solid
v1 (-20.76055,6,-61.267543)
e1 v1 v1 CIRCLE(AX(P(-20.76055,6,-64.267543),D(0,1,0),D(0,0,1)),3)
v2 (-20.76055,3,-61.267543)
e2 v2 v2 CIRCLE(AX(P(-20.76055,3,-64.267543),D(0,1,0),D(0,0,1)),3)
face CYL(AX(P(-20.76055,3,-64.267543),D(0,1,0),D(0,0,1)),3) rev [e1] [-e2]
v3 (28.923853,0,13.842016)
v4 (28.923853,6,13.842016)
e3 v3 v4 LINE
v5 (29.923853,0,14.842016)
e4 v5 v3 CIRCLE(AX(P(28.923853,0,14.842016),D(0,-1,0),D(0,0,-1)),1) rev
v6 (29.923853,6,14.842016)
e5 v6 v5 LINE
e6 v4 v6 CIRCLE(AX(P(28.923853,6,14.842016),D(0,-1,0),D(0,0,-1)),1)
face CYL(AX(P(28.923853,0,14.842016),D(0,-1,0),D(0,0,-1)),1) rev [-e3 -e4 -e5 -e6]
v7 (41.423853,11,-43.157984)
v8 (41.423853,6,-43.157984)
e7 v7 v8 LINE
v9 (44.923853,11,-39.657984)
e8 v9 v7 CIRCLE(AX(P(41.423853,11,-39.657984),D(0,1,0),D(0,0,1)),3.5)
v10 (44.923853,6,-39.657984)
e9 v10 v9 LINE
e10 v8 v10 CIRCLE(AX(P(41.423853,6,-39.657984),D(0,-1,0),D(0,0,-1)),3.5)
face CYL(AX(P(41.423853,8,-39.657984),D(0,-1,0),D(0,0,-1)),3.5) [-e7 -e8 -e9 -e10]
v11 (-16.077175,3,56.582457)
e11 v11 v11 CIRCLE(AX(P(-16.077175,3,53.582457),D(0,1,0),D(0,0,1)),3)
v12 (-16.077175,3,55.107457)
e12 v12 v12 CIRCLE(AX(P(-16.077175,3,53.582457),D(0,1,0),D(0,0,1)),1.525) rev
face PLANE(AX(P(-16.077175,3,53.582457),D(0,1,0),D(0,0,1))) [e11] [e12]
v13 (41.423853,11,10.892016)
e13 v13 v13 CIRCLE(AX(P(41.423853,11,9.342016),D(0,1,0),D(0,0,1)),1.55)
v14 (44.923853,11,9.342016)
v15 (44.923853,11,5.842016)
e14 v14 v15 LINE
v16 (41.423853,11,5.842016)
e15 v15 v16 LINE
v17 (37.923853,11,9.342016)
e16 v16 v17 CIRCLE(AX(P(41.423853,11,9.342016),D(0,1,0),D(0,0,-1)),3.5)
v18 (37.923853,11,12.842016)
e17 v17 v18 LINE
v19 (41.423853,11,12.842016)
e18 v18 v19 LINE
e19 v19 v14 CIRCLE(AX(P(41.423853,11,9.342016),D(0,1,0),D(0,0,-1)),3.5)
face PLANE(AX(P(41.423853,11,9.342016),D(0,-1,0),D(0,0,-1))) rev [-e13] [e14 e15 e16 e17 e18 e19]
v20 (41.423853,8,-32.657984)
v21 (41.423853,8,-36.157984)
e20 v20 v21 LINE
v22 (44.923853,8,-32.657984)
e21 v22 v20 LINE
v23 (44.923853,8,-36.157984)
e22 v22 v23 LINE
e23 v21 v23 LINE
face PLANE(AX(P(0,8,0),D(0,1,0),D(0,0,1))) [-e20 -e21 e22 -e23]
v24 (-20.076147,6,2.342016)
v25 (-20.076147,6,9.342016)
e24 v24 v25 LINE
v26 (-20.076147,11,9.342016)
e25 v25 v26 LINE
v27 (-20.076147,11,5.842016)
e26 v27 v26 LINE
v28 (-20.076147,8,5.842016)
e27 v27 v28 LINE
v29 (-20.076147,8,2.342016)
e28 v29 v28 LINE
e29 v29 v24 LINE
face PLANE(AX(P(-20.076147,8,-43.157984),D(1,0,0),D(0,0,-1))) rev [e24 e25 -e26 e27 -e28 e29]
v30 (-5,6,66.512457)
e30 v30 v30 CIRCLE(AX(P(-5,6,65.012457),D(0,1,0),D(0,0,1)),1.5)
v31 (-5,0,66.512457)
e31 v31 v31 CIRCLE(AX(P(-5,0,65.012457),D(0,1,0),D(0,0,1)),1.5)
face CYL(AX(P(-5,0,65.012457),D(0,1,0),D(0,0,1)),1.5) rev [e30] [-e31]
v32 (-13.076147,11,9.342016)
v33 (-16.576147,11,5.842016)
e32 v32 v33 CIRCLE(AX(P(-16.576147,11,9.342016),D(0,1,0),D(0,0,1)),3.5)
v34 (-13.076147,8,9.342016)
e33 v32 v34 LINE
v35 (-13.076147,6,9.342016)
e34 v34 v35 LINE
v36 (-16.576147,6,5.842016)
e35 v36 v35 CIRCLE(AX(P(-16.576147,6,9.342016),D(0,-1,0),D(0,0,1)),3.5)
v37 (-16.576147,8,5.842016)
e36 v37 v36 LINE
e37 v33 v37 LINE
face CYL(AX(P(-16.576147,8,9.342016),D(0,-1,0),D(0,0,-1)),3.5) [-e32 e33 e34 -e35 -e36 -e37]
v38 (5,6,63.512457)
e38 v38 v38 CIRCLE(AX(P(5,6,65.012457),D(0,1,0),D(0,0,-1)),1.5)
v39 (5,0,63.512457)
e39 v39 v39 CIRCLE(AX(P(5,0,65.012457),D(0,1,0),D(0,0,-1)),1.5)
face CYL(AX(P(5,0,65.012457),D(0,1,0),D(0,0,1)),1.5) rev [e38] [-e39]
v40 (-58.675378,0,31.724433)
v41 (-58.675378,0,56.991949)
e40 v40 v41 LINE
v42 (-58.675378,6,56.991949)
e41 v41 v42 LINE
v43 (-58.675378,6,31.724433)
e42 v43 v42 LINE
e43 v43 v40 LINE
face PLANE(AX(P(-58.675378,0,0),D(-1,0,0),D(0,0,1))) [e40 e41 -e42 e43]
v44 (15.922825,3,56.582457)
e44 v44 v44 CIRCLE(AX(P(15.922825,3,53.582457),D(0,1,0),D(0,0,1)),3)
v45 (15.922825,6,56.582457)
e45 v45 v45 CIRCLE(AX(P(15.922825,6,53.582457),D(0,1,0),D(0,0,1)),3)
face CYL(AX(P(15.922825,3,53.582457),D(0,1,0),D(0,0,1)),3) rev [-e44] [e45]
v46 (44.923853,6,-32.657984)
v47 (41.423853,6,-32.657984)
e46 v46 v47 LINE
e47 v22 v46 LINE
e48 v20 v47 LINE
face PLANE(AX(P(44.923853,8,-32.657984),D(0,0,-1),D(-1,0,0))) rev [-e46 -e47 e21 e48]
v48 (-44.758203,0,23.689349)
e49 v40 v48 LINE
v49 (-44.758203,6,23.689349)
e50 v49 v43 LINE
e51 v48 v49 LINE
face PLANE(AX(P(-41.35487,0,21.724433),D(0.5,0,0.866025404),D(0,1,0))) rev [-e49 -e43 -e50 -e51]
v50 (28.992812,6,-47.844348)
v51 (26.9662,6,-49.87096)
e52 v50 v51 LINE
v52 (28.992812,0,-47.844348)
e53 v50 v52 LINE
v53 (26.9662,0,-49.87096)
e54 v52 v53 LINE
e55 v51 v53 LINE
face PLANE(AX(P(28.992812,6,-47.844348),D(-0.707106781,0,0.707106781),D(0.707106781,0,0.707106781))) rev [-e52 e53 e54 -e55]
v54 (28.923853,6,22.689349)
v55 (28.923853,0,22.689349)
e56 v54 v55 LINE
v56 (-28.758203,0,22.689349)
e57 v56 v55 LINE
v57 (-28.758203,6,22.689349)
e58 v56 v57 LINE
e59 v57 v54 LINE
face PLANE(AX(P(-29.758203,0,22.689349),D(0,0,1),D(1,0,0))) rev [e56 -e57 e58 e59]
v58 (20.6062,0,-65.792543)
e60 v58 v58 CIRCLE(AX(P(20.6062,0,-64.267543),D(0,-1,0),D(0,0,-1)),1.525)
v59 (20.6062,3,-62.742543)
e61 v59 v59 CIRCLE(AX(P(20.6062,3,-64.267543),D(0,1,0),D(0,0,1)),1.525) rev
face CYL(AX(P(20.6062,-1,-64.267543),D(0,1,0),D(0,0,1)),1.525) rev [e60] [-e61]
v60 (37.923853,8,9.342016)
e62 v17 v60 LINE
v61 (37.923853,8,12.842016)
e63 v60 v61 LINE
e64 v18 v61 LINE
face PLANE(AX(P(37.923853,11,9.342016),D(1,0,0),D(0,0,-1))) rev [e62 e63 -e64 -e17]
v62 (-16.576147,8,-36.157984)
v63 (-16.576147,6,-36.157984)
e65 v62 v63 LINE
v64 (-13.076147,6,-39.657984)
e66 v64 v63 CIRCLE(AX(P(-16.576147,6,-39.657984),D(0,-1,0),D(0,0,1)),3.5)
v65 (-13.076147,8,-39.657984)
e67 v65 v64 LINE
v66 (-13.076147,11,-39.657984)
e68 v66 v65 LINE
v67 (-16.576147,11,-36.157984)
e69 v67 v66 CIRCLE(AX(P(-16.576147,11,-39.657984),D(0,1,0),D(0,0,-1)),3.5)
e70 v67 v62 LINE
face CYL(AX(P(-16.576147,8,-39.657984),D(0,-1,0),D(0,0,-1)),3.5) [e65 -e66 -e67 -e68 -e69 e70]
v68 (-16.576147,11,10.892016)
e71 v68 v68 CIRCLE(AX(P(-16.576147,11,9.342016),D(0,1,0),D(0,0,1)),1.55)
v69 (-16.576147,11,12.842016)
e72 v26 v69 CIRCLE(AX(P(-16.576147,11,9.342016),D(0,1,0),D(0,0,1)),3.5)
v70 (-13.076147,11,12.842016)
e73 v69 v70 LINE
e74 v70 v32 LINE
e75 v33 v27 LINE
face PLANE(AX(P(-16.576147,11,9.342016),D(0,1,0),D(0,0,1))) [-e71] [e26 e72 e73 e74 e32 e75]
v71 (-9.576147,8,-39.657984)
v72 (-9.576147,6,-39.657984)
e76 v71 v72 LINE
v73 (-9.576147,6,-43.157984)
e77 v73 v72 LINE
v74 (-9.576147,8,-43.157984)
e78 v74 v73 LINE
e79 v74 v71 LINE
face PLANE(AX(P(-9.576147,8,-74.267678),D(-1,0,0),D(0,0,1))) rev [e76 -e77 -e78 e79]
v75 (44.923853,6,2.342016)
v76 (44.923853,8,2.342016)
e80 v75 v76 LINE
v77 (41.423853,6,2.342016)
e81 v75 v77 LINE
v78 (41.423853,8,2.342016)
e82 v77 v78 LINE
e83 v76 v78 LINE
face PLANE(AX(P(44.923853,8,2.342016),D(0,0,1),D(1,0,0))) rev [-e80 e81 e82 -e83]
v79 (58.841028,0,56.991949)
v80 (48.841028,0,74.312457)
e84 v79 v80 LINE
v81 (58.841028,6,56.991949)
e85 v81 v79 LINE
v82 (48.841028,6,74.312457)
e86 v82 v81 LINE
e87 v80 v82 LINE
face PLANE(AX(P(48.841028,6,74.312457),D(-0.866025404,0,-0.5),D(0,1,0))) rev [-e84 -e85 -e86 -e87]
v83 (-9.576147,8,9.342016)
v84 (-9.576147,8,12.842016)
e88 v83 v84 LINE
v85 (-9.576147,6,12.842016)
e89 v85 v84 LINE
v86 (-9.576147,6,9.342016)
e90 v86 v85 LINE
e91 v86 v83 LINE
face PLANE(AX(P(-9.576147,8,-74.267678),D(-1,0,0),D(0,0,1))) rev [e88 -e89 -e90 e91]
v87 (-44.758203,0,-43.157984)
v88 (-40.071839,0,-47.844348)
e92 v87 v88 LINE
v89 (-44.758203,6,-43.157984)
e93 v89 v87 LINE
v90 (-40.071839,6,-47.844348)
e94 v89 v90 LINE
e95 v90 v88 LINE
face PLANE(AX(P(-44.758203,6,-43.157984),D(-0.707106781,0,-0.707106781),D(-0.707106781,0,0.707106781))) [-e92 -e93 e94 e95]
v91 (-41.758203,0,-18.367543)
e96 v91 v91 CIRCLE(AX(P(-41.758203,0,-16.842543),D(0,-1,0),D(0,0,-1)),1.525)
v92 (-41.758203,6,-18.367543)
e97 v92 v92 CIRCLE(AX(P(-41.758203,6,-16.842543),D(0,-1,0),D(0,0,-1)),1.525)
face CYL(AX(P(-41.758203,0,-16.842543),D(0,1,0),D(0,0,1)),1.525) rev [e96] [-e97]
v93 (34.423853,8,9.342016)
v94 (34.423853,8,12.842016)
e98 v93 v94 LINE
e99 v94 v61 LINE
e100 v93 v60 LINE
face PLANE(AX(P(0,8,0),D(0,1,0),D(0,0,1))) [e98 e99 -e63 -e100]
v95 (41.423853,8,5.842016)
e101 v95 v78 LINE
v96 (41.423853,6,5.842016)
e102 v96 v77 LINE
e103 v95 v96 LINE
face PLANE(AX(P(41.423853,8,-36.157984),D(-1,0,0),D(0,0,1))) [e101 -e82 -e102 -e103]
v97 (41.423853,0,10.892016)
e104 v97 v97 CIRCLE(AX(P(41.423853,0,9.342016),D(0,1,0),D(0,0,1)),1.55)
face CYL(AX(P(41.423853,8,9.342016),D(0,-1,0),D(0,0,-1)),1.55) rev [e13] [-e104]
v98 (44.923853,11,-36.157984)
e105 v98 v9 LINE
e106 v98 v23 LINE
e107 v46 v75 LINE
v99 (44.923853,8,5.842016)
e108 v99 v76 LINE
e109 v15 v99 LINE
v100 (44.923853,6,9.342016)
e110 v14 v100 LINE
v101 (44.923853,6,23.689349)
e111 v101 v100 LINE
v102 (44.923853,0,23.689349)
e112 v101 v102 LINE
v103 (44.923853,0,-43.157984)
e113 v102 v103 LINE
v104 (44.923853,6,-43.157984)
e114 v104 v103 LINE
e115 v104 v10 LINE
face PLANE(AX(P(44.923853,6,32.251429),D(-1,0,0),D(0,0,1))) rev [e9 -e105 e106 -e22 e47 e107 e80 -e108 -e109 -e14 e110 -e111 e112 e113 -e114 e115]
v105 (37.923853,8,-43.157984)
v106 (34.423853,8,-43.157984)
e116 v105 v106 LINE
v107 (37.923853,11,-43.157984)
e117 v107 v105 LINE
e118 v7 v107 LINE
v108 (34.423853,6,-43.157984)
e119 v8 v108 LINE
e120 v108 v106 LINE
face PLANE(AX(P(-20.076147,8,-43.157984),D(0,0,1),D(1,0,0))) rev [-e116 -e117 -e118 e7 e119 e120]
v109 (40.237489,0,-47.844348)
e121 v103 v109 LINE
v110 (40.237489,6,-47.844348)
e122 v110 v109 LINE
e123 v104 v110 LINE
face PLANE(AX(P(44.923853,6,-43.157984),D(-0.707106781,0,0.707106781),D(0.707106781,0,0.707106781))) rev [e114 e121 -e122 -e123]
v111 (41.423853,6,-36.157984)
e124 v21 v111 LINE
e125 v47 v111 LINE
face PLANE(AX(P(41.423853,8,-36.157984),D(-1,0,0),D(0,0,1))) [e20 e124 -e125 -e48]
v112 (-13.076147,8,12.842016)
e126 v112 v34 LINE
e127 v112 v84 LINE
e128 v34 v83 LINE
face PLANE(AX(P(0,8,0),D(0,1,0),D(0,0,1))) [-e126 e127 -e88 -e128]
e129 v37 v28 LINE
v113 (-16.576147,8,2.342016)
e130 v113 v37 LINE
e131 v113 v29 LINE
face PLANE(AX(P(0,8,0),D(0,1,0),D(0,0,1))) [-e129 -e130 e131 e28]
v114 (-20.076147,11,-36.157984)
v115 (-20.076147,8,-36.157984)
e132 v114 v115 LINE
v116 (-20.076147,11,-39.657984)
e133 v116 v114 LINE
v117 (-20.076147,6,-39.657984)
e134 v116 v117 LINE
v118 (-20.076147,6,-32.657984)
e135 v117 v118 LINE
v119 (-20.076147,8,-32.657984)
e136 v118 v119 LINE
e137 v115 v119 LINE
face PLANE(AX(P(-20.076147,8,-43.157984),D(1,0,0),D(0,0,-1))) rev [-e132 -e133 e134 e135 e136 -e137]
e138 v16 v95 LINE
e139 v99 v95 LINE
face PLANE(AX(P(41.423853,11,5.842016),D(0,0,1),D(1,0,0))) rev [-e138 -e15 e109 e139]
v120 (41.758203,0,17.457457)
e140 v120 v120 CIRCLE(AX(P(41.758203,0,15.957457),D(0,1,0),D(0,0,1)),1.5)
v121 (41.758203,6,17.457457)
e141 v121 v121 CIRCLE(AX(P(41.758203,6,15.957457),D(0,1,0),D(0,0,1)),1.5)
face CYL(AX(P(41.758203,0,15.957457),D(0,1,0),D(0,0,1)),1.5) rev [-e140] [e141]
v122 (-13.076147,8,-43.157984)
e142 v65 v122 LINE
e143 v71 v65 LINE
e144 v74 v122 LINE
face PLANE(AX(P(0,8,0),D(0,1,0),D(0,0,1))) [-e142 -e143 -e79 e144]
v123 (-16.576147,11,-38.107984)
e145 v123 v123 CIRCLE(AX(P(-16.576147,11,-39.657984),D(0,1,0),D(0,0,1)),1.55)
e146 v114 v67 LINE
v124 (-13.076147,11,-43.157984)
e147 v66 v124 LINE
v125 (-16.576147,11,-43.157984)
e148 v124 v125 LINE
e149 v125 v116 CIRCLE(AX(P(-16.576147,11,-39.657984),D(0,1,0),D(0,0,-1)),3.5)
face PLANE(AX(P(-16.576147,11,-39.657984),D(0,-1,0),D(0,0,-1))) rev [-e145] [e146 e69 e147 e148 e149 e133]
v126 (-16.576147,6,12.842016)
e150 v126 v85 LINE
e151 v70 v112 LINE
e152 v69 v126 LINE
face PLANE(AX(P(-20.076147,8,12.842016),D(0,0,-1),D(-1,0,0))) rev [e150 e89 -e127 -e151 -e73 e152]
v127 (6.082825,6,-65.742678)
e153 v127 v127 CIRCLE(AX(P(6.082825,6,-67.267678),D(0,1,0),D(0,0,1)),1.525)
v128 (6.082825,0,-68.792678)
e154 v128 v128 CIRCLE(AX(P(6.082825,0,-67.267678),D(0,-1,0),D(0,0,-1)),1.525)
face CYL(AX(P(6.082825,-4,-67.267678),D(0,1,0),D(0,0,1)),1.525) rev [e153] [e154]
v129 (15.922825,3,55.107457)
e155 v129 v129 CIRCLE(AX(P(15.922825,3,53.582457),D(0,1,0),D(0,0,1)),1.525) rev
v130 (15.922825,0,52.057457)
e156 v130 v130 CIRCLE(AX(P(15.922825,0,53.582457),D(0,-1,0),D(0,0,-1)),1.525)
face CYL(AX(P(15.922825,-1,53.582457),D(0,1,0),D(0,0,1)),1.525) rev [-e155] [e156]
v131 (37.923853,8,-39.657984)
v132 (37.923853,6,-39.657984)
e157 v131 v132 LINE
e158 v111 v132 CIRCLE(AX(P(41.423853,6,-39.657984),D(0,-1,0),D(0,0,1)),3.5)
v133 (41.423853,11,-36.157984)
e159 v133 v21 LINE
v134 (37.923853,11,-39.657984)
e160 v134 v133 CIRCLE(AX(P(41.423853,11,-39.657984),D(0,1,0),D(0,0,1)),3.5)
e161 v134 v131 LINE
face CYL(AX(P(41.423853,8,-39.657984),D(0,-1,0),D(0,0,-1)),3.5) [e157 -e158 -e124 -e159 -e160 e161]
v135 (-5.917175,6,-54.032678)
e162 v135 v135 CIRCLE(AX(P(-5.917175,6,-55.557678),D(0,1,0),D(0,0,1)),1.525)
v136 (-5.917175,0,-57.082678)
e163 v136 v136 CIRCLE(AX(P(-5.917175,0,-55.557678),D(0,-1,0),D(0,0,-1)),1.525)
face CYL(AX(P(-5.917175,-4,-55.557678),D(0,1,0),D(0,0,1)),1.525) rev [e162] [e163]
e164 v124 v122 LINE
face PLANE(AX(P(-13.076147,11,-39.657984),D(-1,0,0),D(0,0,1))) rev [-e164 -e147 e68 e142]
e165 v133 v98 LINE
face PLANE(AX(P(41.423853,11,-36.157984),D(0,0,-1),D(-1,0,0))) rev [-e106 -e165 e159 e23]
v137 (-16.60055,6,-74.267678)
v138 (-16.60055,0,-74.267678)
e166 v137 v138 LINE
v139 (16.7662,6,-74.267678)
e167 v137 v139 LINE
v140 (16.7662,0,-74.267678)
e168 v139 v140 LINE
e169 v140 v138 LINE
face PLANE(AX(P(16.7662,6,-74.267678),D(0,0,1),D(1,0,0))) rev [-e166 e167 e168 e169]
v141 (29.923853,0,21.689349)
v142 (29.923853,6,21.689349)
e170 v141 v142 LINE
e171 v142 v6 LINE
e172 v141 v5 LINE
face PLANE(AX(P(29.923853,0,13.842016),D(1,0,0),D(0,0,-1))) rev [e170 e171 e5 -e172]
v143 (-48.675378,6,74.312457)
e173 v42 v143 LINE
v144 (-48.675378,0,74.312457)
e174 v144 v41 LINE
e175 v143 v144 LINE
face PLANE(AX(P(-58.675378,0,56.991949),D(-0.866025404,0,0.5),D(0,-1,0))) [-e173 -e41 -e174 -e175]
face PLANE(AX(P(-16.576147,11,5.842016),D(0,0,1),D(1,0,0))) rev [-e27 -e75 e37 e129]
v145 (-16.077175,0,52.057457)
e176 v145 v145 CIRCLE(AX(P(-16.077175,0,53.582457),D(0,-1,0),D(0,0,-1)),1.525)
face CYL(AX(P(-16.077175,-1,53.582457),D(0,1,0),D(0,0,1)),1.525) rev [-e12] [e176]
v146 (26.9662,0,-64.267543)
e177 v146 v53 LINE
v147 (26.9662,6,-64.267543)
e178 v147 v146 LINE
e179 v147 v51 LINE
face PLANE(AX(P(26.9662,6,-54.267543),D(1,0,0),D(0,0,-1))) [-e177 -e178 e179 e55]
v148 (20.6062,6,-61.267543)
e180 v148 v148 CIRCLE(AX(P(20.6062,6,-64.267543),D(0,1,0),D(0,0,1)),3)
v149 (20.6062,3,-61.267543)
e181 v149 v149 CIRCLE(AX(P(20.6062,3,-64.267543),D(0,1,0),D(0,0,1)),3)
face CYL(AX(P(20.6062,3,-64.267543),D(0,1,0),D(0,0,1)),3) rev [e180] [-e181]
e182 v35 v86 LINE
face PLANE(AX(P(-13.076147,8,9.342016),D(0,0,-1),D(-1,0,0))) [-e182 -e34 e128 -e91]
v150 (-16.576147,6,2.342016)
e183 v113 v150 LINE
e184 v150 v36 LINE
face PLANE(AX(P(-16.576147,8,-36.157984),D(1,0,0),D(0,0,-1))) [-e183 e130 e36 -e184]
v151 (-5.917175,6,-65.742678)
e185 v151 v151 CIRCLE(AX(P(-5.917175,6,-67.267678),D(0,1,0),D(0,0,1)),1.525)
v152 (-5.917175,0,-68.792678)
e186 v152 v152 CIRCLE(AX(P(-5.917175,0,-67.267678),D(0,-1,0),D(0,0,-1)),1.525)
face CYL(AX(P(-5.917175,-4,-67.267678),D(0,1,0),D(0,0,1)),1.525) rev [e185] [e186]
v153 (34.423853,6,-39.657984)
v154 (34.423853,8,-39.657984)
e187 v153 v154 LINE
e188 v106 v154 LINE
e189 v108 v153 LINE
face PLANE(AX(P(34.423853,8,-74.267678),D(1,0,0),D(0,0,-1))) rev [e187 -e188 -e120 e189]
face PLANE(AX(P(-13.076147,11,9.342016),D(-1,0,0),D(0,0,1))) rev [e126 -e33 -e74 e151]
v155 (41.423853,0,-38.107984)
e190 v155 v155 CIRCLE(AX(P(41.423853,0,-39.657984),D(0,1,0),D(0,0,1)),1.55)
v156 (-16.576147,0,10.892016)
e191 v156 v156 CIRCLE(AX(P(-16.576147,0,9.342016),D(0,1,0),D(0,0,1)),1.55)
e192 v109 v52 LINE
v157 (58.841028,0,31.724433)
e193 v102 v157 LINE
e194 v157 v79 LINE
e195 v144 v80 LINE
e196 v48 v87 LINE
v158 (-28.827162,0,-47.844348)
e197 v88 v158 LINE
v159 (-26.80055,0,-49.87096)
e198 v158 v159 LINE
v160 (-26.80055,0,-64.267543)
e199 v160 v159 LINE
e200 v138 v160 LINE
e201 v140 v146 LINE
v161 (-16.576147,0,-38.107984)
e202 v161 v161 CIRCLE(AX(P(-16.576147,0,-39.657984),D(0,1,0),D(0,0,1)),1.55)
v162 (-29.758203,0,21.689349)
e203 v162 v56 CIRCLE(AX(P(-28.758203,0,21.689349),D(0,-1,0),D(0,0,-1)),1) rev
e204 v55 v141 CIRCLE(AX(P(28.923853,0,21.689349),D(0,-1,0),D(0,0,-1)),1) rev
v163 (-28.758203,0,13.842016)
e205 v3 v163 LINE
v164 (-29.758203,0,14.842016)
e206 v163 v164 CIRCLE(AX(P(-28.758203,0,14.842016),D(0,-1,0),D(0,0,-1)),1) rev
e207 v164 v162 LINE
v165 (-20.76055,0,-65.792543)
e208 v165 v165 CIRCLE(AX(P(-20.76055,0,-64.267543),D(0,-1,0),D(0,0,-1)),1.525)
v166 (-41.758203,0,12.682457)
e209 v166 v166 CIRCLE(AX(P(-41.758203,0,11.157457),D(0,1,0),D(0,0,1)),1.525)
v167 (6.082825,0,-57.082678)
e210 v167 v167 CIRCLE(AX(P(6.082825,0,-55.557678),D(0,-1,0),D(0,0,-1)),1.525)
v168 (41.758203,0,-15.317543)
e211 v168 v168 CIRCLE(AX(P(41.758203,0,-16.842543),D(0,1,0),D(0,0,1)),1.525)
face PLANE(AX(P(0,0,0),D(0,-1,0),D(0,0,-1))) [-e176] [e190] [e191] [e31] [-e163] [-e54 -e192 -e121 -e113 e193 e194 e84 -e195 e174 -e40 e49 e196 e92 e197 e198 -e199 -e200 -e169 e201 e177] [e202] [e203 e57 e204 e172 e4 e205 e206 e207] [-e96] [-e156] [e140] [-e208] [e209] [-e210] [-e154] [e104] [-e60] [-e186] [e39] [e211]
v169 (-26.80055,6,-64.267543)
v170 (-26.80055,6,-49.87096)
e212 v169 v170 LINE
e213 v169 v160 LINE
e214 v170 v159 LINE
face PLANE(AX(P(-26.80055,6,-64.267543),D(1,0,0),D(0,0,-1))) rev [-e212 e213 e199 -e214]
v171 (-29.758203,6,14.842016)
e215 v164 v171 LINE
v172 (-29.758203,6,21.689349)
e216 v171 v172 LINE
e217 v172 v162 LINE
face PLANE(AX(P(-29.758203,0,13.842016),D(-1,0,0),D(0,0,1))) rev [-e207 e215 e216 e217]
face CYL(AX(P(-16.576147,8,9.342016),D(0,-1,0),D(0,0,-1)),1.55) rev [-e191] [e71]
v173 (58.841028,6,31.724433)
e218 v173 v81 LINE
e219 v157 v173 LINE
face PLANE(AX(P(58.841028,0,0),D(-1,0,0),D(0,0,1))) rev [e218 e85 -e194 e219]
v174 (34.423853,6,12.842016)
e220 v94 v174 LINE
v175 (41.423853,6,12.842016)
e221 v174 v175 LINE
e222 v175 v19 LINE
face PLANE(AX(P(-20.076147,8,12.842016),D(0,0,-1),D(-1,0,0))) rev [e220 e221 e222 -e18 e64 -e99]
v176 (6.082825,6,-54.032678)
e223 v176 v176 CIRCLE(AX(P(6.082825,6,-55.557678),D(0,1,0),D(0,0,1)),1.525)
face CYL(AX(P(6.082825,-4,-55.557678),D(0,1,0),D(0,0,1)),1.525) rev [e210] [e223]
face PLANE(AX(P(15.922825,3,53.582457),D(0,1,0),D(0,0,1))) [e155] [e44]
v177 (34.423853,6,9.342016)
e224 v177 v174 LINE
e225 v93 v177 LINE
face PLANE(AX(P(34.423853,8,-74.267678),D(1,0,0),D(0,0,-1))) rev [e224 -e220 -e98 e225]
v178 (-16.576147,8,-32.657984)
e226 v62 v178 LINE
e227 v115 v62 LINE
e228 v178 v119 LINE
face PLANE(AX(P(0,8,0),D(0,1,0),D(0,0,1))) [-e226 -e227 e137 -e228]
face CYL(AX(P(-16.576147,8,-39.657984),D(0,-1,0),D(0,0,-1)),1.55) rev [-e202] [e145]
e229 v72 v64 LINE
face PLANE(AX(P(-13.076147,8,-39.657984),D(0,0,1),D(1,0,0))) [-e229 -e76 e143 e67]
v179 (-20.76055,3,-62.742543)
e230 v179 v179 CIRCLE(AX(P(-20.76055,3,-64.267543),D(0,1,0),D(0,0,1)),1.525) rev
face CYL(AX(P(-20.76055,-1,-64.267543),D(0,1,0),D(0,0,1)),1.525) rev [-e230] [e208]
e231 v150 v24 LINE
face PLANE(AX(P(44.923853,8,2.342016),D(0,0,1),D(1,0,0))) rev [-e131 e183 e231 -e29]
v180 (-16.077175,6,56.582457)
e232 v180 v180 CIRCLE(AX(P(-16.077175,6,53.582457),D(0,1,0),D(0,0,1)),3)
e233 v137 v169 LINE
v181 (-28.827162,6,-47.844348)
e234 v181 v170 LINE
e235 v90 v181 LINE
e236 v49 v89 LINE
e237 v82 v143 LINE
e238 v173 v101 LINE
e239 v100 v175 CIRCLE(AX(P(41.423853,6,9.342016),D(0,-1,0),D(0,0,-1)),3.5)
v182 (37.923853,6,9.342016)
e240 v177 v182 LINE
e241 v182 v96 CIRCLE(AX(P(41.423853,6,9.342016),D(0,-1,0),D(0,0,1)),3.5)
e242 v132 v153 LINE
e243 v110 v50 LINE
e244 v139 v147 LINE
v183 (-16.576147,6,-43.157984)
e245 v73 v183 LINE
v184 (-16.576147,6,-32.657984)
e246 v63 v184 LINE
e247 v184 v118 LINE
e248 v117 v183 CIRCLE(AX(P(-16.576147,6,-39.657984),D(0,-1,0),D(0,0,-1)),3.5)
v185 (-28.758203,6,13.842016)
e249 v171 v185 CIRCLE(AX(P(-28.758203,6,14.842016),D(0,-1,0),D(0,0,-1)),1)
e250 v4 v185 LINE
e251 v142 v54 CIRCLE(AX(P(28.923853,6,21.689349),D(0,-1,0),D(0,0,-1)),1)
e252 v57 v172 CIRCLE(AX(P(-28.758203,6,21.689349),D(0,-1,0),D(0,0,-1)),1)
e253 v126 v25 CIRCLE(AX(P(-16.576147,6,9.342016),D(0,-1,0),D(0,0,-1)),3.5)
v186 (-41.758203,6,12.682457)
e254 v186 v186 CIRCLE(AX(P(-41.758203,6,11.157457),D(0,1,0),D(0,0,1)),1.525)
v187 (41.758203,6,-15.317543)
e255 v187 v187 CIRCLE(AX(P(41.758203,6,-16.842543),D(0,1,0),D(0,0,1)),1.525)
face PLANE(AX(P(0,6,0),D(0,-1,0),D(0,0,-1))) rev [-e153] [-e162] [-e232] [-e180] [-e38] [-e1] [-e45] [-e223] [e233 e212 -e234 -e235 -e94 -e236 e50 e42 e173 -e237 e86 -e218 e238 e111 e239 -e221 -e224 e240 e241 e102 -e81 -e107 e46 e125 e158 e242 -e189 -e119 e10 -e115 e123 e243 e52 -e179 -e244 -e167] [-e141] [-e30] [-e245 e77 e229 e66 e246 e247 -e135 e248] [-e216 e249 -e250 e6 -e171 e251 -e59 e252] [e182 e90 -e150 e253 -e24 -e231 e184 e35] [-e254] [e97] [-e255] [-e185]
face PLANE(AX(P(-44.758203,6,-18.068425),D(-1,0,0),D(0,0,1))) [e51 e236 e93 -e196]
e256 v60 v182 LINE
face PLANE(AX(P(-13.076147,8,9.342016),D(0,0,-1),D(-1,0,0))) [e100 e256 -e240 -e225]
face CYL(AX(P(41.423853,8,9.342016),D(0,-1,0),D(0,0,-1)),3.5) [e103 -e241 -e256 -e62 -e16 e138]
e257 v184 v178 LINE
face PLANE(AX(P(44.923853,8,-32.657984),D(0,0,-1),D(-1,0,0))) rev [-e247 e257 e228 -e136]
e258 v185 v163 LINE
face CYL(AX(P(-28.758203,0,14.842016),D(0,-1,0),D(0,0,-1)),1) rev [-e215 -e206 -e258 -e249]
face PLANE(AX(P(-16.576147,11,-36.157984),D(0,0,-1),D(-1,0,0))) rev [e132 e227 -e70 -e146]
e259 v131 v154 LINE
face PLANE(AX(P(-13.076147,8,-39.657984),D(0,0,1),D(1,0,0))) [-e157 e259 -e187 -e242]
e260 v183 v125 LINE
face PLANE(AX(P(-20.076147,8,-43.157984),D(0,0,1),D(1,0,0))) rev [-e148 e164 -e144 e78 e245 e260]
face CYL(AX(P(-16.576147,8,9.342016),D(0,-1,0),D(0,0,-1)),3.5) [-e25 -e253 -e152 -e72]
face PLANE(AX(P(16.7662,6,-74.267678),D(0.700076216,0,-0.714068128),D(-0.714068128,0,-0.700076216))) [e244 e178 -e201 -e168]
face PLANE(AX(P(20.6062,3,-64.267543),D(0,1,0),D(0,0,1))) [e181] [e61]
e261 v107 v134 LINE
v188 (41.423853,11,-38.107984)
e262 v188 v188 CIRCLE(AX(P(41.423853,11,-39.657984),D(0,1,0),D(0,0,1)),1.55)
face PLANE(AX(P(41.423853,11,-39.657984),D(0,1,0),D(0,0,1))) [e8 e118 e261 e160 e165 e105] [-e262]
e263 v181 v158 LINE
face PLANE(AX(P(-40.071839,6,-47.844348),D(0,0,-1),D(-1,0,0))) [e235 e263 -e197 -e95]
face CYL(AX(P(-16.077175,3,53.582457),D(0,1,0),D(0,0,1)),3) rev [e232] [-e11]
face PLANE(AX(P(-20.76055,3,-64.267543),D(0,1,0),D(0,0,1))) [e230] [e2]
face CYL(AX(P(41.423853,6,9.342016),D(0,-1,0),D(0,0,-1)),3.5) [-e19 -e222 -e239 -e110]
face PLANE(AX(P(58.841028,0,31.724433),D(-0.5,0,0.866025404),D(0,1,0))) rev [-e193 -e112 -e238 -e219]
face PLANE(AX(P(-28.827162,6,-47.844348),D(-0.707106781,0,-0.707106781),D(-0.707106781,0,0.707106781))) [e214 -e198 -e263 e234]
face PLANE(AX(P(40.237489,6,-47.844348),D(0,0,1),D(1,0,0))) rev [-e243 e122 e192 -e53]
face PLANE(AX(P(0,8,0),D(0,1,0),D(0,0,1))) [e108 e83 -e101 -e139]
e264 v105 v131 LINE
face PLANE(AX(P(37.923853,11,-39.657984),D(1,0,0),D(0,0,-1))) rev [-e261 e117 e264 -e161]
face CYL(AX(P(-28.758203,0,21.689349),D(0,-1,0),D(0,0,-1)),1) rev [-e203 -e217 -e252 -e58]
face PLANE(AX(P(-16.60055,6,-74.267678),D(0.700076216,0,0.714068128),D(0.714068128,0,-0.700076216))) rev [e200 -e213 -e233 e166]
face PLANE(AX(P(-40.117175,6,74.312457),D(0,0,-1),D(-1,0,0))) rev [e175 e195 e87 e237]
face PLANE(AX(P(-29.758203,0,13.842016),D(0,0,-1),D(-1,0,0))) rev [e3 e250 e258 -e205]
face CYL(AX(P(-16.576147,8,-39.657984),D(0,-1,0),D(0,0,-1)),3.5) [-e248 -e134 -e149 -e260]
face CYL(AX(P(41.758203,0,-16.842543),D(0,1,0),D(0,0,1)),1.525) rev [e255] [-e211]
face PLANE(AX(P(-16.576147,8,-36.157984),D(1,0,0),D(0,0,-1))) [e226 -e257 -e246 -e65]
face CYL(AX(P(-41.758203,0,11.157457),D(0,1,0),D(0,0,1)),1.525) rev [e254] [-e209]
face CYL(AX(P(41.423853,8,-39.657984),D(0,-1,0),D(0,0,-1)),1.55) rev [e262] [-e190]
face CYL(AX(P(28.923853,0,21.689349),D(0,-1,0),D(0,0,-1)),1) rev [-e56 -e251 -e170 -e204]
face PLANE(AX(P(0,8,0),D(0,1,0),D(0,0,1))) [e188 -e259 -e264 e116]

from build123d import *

# Parameters (mm, degrees)
BOSS_EXTRUDE1_DEPTH     = 6
SKETCH2_R               = 1.525
CUT_EXTRUDE1_DEPTH      = 7
SKETCH3_R               = 3
CUT_EXTRUDE2_DEPTH      = 3
SKETCH4_W               = 65
SKETCH4_H               = 56
SKETCH4_R               = 1.55
BOSS_EXTRUDE3_DEPTH     = 2
FILLET1_R               = 3.5
CUT_EXTRUDE3_DEPTH      = 100.052214883
CUT_EXTRUDE3_DEPTH_BACK = 100.052214883
SKETCH5_W               = 35
SKETCH5_H               = 2
CUT_EXTRUDE4_DEPTH      = 88.043057368
CUT_EXTRUDE4_DEPTH_BACK = 88.043057368
SKETCH4_2_R             = 1.55
CUT_EXTRUDE5_DEPTH      = 99.337435643
CUT_EXTRUDE5_DEPTH_BACK = 99.337435643
SKETCH6_W               = 44
SKETCH6_H               = 2
SKETCH8_R               = 1.55
BOSS_EXTRUDE4_DEPTH     = 3
SKETCH9_R               = 1.525
CUT_EXTRUDE6_DEPTH      = 10
SKETCH10_R              = 1.525
SKETCH10_R_2            = 1.5
CUT_EXTRUDE7_DEPTH      = 88.043057368
SKETCH11_R              = 1.5
CUT_EXTRUDE8_DEPTH      = 88.043057368
BOSS_EXTRUDE5_DEPTH     = 6
CHAMFER1_SIZE           = 10
CHAMFER1_SIZE2          = 17.320508076
CHAMFER2_SIZE           = 10
CHAMFER2_SIZE_2         = 17.320508076
SKETCH13_W              = 59.682055882
SKETCH13_H              = 8.847332747
CUT_EXTRUDE9_DEPTH      = 95.976880568
FILLET2_R               = 1


with BuildPart() as part:
    # Sketch1 → Boss-Extrude1 (new body)
    with BuildSketch(Plane(origin=(0, 0, 0), x_dir=(1, 0, 0), z_dir=(0, 1, 0))):
        Polygon((-16.600550214, 74.267677554), (-26.800550214, 64.267542947), (-26.800550214, 54.267542947), (-26.800550214, 49.870959834), (-28.827161805, 47.844348244), (-40.071838845, 47.844348244), (-44.758202946, 43.157984143), (-44.758202946, 18.06842534), (-44.758202946, -12.842015857), (-44.758202946, -32.251429112), (-40.117175005, -36.892457053), (-40.117175005, -74.312457053), (0.082824995, -74.312457053), (40.282824995, -74.312457053), (40.282824995, -36.892457053), (44.923852936, -32.251429112), (44.923852936, -12.842015857), (44.923852936, 18.06842534), (44.923852936, 43.157984143), (40.237488836, 47.844348244), (28.992811796, 47.844348244), (26.966200205, 49.870959834), (26.966200205, 54.267542947), (26.966200205, 64.267542947), (16.766200205, 74.267677554), (0.082824995, 74.267677554), align=None)
    extrude(amount=BOSS_EXTRUDE1_DEPTH)

    # Sketch2 → Cut-Extrude1 (cut)
    with BuildSketch(Plane(origin=(0, 6, 0), x_dir=(1, 0, 0), z_dir=(0, 1, 0))):
        with Locations(Location((-20.760550214, 64.267542947, 0), (0, 0, 270))):
            Circle(SKETCH2_R)
        with Locations(Location((20.606200205, 64.267542947, 0), (0, 0, 270))):
            Circle(SKETCH2_R)
        with Locations(Location((-16.077175005, -53.582457053, 0), (0, 0, 270))):
            Circle(SKETCH2_R)
        with Locations(Location((15.922824995, -53.582457053, 0), (0, 0, 270))):
            Circle(SKETCH2_R)
    extrude(amount=-CUT_EXTRUDE1_DEPTH, mode=Mode.SUBTRACT)

    # Sketch3 → Cut-Extrude2 (cut)
    with BuildSketch(Plane(origin=(0, 6, 0), x_dir=(1, 0, 0), z_dir=(0, 1, 0))):
        with Locations(Location((-20.760550214, 64.267542947, 0), (0, 0, 270))):
            Circle(SKETCH3_R)
        with Locations(Location((20.606200205, 64.267542947, 0), (0, 0, 270))):
            Circle(SKETCH3_R)
        with Locations(Location((-16.077175005, -53.582457053, 0), (0, 0, 270))):
            Circle(SKETCH3_R)
        with Locations(Location((15.922824995, -53.582457053, 0), (0, 0, 270))):
            Circle(SKETCH3_R)
    extrude(amount=-CUT_EXTRUDE2_DEPTH, mode=Mode.SUBTRACT)

    # Sketch4 → Boss-Extrude3 (add)
    with BuildSketch(Plane(origin=(0, 6, 0), x_dir=(1, 0, 0), z_dir=(0, 1, 0))):
        with Locations((12.423852936, 15.157984143)):
            Rectangle(SKETCH4_W, SKETCH4_H)
        with Locations(Location((-16.576147064, 39.657984143, 0), (0, 0, 270))):
            Circle(SKETCH4_R, mode=Mode.SUBTRACT)
        with Locations(Location((41.423852936, 39.657984143, 0), (0, 0, 270))):
            Circle(SKETCH4_R, mode=Mode.SUBTRACT)
        with Locations(Location((41.423852936, -9.342015857, 0), (0, 0, 270))):
            Circle(SKETCH4_R, mode=Mode.SUBTRACT)
        with Locations(Location((-16.576147064, -9.342015857, 0), (0, 0, 270))):
            Circle(SKETCH4_R, mode=Mode.SUBTRACT)
        with BuildLine():
            Line((41.423852936, 36.157984143), (41.423852936, -5.842015857))
            ThreePointArc((41.423852936, -5.842015857), (38.948979202, -6.867142122), (37.923852936, -9.342015857))
            Line((37.923852936, -9.342015857), (-13.076147064, -9.342015857))
            ThreePointArc((-13.076147064, -9.342015857), (-14.101273329, -6.867142122), (-16.576147064, -5.842015857))
            Line((-16.576147064, -5.842015857), (-16.576147064, 36.157984143))
            ThreePointArc((-16.576147064, 36.157984143), (-14.101273329, 37.183110409), (-13.076147064, 39.657984143))
            Line((-13.076147064, 39.657984143), (37.923852936, 39.657984143))
            ThreePointArc((37.923852936, 39.657984143), (38.948979202, 37.183110409), (41.423852936, 36.157984143))
        make_face(mode=Mode.SUBTRACT)
    extrude(amount=BOSS_EXTRUDE3_DEPTH)

    # Fillet1
    fillet1_edges = [part.edges().sort_by_distance(p)[0] for p in [
        (-20.076147064, 7, -43.157984143),
        (-20.076147064, 7, 12.842015857),
        (44.923852936, 7, 12.842015857),
        (44.923852936, 7, -43.157984143),
    ]]
    fillet(fillet1_edges, radius=FILLET1_R)

    # Sketch5 → Cut-Extrude3 (cut, two sides: drawn at the far end of the back side and taken through both)
    with BuildSketch(Plane.ZY.offset(20.076147064).offset(-CUT_EXTRUDE3_DEPTH_BACK)):
        with Locations((-15.157984143, 7)):
            Rectangle(SKETCH5_W, SKETCH5_H)
    extrude(amount=CUT_EXTRUDE3_DEPTH + CUT_EXTRUDE3_DEPTH_BACK, mode=Mode.SUBTRACT)

    # Sketch4<2> → Cut-Extrude4 (cut, two sides: drawn at the far end of the back side and taken through both)
    with BuildSketch(Plane(origin=(0, 6, 0), x_dir=(1, 0, 0), z_dir=(0, 1, 0)).offset(-CUT_EXTRUDE4_DEPTH_BACK)):
        with Locations(Location((-16.576147064, 39.657984143, 0), (0, 0, 270))):
            Circle(SKETCH4_2_R)
        with Locations(Location((41.423852936, 39.657984143, 0), (0, 0, 270))):
            Circle(SKETCH4_2_R)
        with Locations(Location((41.423852936, -9.342015857, 0), (0, 0, 270))):
            Circle(SKETCH4_2_R)
        with Locations(Location((-16.576147064, -9.342015857, 0), (0, 0, 270))):
            Circle(SKETCH4_2_R)
    extrude(amount=CUT_EXTRUDE4_DEPTH + CUT_EXTRUDE4_DEPTH_BACK, mode=Mode.SUBTRACT)

    # Sketch6 → Cut-Extrude5 (cut, two sides: drawn at the far end of the back side and taken through both)
    with BuildSketch(Plane.XY.offset(12.842015857).offset(-CUT_EXTRUDE5_DEPTH_BACK)):
        with Locations((12.423852936, 7)):
            Rectangle(SKETCH6_W, SKETCH6_H)
    extrude(amount=CUT_EXTRUDE5_DEPTH + CUT_EXTRUDE5_DEPTH_BACK, mode=Mode.SUBTRACT)

    # Sketch8 → Boss-Extrude4 (add)
    # profile 1 of 4: a face of its own
    with BuildSketch(Plane(origin=(0, 8, 0), x_dir=(1, 0, 0), z_dir=(0, 1, 0))):
        with BuildLine():
            Line((-13.076147064, -9.342015857), (-13.076147064, -12.842015857))
            Line((-13.076147064, -12.842015857), (-16.576147064, -12.842015857))
            ThreePointArc((-16.576147064, -12.842015857), (-19.051020798, -11.816889591), (-20.076147064, -9.342015857))
            Line((-20.076147064, -9.342015857), (-20.076147064, -5.842015857))
            Line((-20.076147064, -5.842015857), (-16.576147064, -5.842015857))
            ThreePointArc((-16.576147064, -5.842015857), (-14.101273329, -6.867142122), (-13.076147064, -9.342015857))
        make_face()
        with Locations(Location((-16.576147064, -9.342015857, 0), (0, 0, 270))):
            Circle(SKETCH8_R, mode=Mode.SUBTRACT)
    # profile 2 of 4: a face of its own
    with BuildSketch(Plane(origin=(0, 8, 0), x_dir=(1, 0, 0), z_dir=(0, 1, 0))):
        with BuildLine():
            Line((41.423852936, -12.842015857), (37.923852936, -12.842015857))
            Line((37.923852936, -12.842015857), (37.923852936, -9.342015857))
            ThreePointArc((37.923852936, -9.342015857), (38.948979202, -6.867142122), (41.423852936, -5.842015857))
            Line((41.423852936, -5.842015857), (44.923852936, -5.842015857))
            Line((44.923852936, -5.842015857), (44.923852936, -9.342015857))
            ThreePointArc((44.923852936, -9.342015857), (43.898726671, -11.816889591), (41.423852936, -12.842015857))
        make_face()
        with Locations(Location((41.423852936, -9.342015857, 0), (0, 0, 270))):
            Circle(SKETCH8_R, mode=Mode.SUBTRACT)
    # profile 3 of 4: a face of its own
    with BuildSketch(Plane(origin=(0, 8, 0), x_dir=(1, 0, 0), z_dir=(0, 1, 0))):
        with BuildLine():
            Line((-16.576147064, 43.157984143), (-13.076147064, 43.157984143))
            Line((-13.076147064, 43.157984143), (-13.076147064, 39.657984143))
            ThreePointArc((-13.076147064, 39.657984143), (-14.101273329, 37.183110409), (-16.576147064, 36.157984143))
            Line((-16.576147064, 36.157984143), (-20.076147064, 36.157984143))
            Line((-20.076147064, 36.157984143), (-20.076147064, 39.657984143))
            ThreePointArc((-20.076147064, 39.657984143), (-19.051020798, 42.132857878), (-16.576147064, 43.157984143))
        make_face()
        with Locations(Location((-16.576147064, 39.657984143, 0), (0, 0, 270))):
            Circle(SKETCH8_R, mode=Mode.SUBTRACT)
    # profile 4 of 4: a face of its own
    with BuildSketch(Plane(origin=(0, 8, 0), x_dir=(1, 0, 0), z_dir=(0, 1, 0))):
        with BuildLine():
            Line((37.923852936, 39.657984143), (37.923852936, 43.157984143))
            Line((37.923852936, 43.157984143), (41.423852936, 43.157984143))
            ThreePointArc((41.423852936, 43.157984143), (43.898726671, 42.132857878), (44.923852936, 39.657984143))
            Line((44.923852936, 39.657984143), (44.923852936, 36.157984143))
            Line((44.923852936, 36.157984143), (41.423852936, 36.157984143))
            ThreePointArc((41.423852936, 36.157984143), (38.948979202, 37.183110409), (37.923852936, 39.657984143))
        make_face()
        with Locations(Location((41.423852936, 39.657984143, 0), (0, 0, 270))):
            Circle(SKETCH8_R, mode=Mode.SUBTRACT)
    extrude(amount=BOSS_EXTRUDE4_DEPTH)

    # Sketch9 → Cut-Extrude6 (cut)
    with BuildSketch(Plane(origin=(0, 6, 0), x_dir=(1, 0, 0), z_dir=(0, 1, 0))):
        with Locations(Location((-5.917175005, 67.267677554, 0), (0, 0, 270))):
            Circle(SKETCH9_R)
        with Locations(Location((6.082824995, 67.267677554, 0), (0, 0, 270))):
            Circle(SKETCH9_R)
        with Locations(Location((-5.917175005, 55.557677554, 0), (0, 0, 270))):
            Circle(SKETCH9_R)
        with Locations(Location((6.082824995, 55.557677554, 0), (0, 0, 270))):
            Circle(SKETCH9_R)
    extrude(amount=-CUT_EXTRUDE6_DEPTH, mode=Mode.SUBTRACT)

    # Sketch10 → Cut-Extrude7 (cut, through all)
    with BuildSketch(Plane(origin=(0, 6, 0), x_dir=(1, 0, 0), z_dir=(0, 1, 0))):
        with Locations(Location((-41.758202946, -11.157457053, 0), (0, 0, 270))):
            Circle(SKETCH10_R)
        with Locations(Location((-41.758202946, 16.842542947, 0), (0, 0, 90))):
            Circle(SKETCH10_R)
        with Locations(Location((41.758202946, 16.842542947, 0), (0, 0, 270))):
            Circle(SKETCH10_R)
        with Locations(Location((41.758202946, -15.957457053, 0), (0, 0, 270))):
            Circle(SKETCH10_R_2)
    extrude(amount=-CUT_EXTRUDE7_DEPTH, mode=Mode.SUBTRACT)

    # Sketch11 → Cut-Extrude8 (cut, through all)
    with BuildSketch(Plane(origin=(0, 6, 0), x_dir=(1, 0, 0), z_dir=(0, 1, 0))):
        with Locations(Location((-5, -65.012457053, 0), (0, 0, 270))):
            Circle(SKETCH11_R)
        with Locations(Location((5, -65.012457053, 0), (0, 0, 90))):
            Circle(SKETCH11_R)
    extrude(amount=-CUT_EXTRUDE8_DEPTH, mode=Mode.SUBTRACT)

    # Sketch12 → Boss-Extrude5 (add, through all)
    with BuildSketch(Plane(origin=(0, 6, 0), x_dir=(1, 0, 0), z_dir=(0, 1, 0))):
        Polygon((58.841027941, -21.72443334), (44.923852936, -21.72443334), (44.923852936, -32.251429112), (40.282824995, -36.892457053), (40.282824995, -74.312457053), (58.841027941, -74.312457053), align=None)
        Polygon((-44.758202946, -32.251429112), (-44.758202946, -21.72443334), (-58.67537795, -21.72443334), (-58.67537795, -74.312457053), (-40.117175005, -74.312457053), (-40.117175005, -36.892457053), align=None)
    extrude(amount=-BOSS_EXTRUDE5_DEPTH)

    # Chamfer1
    chamfer1_edges = [part.edges().sort_by_distance(p)[0] for p in [
        (58.841027941, 3, 74.312457053),
        (-58.67537795, 3, 74.312457053),
    ]]
    chamfer1_side = [part.faces().sort_by_distance(p)[0] for p in [
        (0.082824995, 3, 74.312457053),
    ]]
    chamfer(chamfer1_edges, length=CHAMFER1_SIZE, length2=CHAMFER1_SIZE2, reference=chamfer1_side[0])

    # Chamfer2
    # the kernel refuses this chamfer: 17.320508076, 10 mm, written as the material it takes off along each edge
    with BuildSketch(Plane(origin=(58.841027941, 50.809639706, 21.72443334), x_dir=(0.05789386240267111, 0, 0.9983227437537926), z_dir=(0, -1, 0))) as chamfer2_piece_1_section:
        Polygon((CHAMFER2_SIZE * 0.998322743754, CHAMFER2_SIZE * 0.0578938624027), (-CHAMFER2_SIZE_2 * 0.0578938624016, CHAMFER2_SIZE_2 * 0.998322743736), (0, 0), align=None)
    chamfer2_piece_1 = extrude(amount=95.619279412, mode=Mode.PRIVATE)
    chamfer2_piece_1 = split(chamfer2_piece_1, bisect_by=Plane(origin=(44.923852936, 3, 25.108409846), z_dir=(1, 0, 0)), keep=Keep.TOP, mode=Mode.PRIVATE)
    add(chamfer2_piece_1, mode=Mode.SUBTRACT)
    with BuildSketch(Plane(origin=(-58.67537795, 50.809639706, 21.72443334), x_dir=(-0.05789386240267113, 0, 0.9983227437537926), z_dir=(0, -1, 0))) as chamfer2_piece_2_section:
        Polygon((CHAMFER2_SIZE * 0.998322743754, -CHAMFER2_SIZE * 0.0578938624027), (-CHAMFER2_SIZE_2 * 0.0578938624016, -CHAMFER2_SIZE_2 * 0.998322743736), (0, 0), align=None)
    chamfer2_piece_2 = extrude(amount=95.619279412, mode=Mode.PRIVATE)
    chamfer2_piece_2 = split(chamfer2_piece_2, bisect_by=Plane(origin=(-44.758202946, 3, 25.108409846), z_dir=(-1, 0, 0)), keep=Keep.TOP, mode=Mode.PRIVATE)
    add(chamfer2_piece_2, mode=Mode.SUBTRACT)

    # Sketch13 → Cut-Extrude9 (cut, through all)
    with BuildSketch(Plane(origin=(0, 6, 0), x_dir=(1, 0, 0), z_dir=(0, 1, 0))):
        with Locations((0.082824995, -18.265682231)):
            Rectangle(SKETCH13_W, SKETCH13_H)
    extrude(amount=-CUT_EXTRUDE9_DEPTH, mode=Mode.SUBTRACT)

    # Fillet2
    fillet2_edges = [part.edges().sort_by_distance(p)[0] for p in [
        (-29.758202946, 3, 22.689348604),
        (-29.758202946, 3, 13.842015857),
        (29.923852936, 3, 13.842015857),
        (29.923852936, 3, 22.689348604),
    ]]
    fillet(fillet2_edges, radius=FILLET2_R)


solid = part.part
